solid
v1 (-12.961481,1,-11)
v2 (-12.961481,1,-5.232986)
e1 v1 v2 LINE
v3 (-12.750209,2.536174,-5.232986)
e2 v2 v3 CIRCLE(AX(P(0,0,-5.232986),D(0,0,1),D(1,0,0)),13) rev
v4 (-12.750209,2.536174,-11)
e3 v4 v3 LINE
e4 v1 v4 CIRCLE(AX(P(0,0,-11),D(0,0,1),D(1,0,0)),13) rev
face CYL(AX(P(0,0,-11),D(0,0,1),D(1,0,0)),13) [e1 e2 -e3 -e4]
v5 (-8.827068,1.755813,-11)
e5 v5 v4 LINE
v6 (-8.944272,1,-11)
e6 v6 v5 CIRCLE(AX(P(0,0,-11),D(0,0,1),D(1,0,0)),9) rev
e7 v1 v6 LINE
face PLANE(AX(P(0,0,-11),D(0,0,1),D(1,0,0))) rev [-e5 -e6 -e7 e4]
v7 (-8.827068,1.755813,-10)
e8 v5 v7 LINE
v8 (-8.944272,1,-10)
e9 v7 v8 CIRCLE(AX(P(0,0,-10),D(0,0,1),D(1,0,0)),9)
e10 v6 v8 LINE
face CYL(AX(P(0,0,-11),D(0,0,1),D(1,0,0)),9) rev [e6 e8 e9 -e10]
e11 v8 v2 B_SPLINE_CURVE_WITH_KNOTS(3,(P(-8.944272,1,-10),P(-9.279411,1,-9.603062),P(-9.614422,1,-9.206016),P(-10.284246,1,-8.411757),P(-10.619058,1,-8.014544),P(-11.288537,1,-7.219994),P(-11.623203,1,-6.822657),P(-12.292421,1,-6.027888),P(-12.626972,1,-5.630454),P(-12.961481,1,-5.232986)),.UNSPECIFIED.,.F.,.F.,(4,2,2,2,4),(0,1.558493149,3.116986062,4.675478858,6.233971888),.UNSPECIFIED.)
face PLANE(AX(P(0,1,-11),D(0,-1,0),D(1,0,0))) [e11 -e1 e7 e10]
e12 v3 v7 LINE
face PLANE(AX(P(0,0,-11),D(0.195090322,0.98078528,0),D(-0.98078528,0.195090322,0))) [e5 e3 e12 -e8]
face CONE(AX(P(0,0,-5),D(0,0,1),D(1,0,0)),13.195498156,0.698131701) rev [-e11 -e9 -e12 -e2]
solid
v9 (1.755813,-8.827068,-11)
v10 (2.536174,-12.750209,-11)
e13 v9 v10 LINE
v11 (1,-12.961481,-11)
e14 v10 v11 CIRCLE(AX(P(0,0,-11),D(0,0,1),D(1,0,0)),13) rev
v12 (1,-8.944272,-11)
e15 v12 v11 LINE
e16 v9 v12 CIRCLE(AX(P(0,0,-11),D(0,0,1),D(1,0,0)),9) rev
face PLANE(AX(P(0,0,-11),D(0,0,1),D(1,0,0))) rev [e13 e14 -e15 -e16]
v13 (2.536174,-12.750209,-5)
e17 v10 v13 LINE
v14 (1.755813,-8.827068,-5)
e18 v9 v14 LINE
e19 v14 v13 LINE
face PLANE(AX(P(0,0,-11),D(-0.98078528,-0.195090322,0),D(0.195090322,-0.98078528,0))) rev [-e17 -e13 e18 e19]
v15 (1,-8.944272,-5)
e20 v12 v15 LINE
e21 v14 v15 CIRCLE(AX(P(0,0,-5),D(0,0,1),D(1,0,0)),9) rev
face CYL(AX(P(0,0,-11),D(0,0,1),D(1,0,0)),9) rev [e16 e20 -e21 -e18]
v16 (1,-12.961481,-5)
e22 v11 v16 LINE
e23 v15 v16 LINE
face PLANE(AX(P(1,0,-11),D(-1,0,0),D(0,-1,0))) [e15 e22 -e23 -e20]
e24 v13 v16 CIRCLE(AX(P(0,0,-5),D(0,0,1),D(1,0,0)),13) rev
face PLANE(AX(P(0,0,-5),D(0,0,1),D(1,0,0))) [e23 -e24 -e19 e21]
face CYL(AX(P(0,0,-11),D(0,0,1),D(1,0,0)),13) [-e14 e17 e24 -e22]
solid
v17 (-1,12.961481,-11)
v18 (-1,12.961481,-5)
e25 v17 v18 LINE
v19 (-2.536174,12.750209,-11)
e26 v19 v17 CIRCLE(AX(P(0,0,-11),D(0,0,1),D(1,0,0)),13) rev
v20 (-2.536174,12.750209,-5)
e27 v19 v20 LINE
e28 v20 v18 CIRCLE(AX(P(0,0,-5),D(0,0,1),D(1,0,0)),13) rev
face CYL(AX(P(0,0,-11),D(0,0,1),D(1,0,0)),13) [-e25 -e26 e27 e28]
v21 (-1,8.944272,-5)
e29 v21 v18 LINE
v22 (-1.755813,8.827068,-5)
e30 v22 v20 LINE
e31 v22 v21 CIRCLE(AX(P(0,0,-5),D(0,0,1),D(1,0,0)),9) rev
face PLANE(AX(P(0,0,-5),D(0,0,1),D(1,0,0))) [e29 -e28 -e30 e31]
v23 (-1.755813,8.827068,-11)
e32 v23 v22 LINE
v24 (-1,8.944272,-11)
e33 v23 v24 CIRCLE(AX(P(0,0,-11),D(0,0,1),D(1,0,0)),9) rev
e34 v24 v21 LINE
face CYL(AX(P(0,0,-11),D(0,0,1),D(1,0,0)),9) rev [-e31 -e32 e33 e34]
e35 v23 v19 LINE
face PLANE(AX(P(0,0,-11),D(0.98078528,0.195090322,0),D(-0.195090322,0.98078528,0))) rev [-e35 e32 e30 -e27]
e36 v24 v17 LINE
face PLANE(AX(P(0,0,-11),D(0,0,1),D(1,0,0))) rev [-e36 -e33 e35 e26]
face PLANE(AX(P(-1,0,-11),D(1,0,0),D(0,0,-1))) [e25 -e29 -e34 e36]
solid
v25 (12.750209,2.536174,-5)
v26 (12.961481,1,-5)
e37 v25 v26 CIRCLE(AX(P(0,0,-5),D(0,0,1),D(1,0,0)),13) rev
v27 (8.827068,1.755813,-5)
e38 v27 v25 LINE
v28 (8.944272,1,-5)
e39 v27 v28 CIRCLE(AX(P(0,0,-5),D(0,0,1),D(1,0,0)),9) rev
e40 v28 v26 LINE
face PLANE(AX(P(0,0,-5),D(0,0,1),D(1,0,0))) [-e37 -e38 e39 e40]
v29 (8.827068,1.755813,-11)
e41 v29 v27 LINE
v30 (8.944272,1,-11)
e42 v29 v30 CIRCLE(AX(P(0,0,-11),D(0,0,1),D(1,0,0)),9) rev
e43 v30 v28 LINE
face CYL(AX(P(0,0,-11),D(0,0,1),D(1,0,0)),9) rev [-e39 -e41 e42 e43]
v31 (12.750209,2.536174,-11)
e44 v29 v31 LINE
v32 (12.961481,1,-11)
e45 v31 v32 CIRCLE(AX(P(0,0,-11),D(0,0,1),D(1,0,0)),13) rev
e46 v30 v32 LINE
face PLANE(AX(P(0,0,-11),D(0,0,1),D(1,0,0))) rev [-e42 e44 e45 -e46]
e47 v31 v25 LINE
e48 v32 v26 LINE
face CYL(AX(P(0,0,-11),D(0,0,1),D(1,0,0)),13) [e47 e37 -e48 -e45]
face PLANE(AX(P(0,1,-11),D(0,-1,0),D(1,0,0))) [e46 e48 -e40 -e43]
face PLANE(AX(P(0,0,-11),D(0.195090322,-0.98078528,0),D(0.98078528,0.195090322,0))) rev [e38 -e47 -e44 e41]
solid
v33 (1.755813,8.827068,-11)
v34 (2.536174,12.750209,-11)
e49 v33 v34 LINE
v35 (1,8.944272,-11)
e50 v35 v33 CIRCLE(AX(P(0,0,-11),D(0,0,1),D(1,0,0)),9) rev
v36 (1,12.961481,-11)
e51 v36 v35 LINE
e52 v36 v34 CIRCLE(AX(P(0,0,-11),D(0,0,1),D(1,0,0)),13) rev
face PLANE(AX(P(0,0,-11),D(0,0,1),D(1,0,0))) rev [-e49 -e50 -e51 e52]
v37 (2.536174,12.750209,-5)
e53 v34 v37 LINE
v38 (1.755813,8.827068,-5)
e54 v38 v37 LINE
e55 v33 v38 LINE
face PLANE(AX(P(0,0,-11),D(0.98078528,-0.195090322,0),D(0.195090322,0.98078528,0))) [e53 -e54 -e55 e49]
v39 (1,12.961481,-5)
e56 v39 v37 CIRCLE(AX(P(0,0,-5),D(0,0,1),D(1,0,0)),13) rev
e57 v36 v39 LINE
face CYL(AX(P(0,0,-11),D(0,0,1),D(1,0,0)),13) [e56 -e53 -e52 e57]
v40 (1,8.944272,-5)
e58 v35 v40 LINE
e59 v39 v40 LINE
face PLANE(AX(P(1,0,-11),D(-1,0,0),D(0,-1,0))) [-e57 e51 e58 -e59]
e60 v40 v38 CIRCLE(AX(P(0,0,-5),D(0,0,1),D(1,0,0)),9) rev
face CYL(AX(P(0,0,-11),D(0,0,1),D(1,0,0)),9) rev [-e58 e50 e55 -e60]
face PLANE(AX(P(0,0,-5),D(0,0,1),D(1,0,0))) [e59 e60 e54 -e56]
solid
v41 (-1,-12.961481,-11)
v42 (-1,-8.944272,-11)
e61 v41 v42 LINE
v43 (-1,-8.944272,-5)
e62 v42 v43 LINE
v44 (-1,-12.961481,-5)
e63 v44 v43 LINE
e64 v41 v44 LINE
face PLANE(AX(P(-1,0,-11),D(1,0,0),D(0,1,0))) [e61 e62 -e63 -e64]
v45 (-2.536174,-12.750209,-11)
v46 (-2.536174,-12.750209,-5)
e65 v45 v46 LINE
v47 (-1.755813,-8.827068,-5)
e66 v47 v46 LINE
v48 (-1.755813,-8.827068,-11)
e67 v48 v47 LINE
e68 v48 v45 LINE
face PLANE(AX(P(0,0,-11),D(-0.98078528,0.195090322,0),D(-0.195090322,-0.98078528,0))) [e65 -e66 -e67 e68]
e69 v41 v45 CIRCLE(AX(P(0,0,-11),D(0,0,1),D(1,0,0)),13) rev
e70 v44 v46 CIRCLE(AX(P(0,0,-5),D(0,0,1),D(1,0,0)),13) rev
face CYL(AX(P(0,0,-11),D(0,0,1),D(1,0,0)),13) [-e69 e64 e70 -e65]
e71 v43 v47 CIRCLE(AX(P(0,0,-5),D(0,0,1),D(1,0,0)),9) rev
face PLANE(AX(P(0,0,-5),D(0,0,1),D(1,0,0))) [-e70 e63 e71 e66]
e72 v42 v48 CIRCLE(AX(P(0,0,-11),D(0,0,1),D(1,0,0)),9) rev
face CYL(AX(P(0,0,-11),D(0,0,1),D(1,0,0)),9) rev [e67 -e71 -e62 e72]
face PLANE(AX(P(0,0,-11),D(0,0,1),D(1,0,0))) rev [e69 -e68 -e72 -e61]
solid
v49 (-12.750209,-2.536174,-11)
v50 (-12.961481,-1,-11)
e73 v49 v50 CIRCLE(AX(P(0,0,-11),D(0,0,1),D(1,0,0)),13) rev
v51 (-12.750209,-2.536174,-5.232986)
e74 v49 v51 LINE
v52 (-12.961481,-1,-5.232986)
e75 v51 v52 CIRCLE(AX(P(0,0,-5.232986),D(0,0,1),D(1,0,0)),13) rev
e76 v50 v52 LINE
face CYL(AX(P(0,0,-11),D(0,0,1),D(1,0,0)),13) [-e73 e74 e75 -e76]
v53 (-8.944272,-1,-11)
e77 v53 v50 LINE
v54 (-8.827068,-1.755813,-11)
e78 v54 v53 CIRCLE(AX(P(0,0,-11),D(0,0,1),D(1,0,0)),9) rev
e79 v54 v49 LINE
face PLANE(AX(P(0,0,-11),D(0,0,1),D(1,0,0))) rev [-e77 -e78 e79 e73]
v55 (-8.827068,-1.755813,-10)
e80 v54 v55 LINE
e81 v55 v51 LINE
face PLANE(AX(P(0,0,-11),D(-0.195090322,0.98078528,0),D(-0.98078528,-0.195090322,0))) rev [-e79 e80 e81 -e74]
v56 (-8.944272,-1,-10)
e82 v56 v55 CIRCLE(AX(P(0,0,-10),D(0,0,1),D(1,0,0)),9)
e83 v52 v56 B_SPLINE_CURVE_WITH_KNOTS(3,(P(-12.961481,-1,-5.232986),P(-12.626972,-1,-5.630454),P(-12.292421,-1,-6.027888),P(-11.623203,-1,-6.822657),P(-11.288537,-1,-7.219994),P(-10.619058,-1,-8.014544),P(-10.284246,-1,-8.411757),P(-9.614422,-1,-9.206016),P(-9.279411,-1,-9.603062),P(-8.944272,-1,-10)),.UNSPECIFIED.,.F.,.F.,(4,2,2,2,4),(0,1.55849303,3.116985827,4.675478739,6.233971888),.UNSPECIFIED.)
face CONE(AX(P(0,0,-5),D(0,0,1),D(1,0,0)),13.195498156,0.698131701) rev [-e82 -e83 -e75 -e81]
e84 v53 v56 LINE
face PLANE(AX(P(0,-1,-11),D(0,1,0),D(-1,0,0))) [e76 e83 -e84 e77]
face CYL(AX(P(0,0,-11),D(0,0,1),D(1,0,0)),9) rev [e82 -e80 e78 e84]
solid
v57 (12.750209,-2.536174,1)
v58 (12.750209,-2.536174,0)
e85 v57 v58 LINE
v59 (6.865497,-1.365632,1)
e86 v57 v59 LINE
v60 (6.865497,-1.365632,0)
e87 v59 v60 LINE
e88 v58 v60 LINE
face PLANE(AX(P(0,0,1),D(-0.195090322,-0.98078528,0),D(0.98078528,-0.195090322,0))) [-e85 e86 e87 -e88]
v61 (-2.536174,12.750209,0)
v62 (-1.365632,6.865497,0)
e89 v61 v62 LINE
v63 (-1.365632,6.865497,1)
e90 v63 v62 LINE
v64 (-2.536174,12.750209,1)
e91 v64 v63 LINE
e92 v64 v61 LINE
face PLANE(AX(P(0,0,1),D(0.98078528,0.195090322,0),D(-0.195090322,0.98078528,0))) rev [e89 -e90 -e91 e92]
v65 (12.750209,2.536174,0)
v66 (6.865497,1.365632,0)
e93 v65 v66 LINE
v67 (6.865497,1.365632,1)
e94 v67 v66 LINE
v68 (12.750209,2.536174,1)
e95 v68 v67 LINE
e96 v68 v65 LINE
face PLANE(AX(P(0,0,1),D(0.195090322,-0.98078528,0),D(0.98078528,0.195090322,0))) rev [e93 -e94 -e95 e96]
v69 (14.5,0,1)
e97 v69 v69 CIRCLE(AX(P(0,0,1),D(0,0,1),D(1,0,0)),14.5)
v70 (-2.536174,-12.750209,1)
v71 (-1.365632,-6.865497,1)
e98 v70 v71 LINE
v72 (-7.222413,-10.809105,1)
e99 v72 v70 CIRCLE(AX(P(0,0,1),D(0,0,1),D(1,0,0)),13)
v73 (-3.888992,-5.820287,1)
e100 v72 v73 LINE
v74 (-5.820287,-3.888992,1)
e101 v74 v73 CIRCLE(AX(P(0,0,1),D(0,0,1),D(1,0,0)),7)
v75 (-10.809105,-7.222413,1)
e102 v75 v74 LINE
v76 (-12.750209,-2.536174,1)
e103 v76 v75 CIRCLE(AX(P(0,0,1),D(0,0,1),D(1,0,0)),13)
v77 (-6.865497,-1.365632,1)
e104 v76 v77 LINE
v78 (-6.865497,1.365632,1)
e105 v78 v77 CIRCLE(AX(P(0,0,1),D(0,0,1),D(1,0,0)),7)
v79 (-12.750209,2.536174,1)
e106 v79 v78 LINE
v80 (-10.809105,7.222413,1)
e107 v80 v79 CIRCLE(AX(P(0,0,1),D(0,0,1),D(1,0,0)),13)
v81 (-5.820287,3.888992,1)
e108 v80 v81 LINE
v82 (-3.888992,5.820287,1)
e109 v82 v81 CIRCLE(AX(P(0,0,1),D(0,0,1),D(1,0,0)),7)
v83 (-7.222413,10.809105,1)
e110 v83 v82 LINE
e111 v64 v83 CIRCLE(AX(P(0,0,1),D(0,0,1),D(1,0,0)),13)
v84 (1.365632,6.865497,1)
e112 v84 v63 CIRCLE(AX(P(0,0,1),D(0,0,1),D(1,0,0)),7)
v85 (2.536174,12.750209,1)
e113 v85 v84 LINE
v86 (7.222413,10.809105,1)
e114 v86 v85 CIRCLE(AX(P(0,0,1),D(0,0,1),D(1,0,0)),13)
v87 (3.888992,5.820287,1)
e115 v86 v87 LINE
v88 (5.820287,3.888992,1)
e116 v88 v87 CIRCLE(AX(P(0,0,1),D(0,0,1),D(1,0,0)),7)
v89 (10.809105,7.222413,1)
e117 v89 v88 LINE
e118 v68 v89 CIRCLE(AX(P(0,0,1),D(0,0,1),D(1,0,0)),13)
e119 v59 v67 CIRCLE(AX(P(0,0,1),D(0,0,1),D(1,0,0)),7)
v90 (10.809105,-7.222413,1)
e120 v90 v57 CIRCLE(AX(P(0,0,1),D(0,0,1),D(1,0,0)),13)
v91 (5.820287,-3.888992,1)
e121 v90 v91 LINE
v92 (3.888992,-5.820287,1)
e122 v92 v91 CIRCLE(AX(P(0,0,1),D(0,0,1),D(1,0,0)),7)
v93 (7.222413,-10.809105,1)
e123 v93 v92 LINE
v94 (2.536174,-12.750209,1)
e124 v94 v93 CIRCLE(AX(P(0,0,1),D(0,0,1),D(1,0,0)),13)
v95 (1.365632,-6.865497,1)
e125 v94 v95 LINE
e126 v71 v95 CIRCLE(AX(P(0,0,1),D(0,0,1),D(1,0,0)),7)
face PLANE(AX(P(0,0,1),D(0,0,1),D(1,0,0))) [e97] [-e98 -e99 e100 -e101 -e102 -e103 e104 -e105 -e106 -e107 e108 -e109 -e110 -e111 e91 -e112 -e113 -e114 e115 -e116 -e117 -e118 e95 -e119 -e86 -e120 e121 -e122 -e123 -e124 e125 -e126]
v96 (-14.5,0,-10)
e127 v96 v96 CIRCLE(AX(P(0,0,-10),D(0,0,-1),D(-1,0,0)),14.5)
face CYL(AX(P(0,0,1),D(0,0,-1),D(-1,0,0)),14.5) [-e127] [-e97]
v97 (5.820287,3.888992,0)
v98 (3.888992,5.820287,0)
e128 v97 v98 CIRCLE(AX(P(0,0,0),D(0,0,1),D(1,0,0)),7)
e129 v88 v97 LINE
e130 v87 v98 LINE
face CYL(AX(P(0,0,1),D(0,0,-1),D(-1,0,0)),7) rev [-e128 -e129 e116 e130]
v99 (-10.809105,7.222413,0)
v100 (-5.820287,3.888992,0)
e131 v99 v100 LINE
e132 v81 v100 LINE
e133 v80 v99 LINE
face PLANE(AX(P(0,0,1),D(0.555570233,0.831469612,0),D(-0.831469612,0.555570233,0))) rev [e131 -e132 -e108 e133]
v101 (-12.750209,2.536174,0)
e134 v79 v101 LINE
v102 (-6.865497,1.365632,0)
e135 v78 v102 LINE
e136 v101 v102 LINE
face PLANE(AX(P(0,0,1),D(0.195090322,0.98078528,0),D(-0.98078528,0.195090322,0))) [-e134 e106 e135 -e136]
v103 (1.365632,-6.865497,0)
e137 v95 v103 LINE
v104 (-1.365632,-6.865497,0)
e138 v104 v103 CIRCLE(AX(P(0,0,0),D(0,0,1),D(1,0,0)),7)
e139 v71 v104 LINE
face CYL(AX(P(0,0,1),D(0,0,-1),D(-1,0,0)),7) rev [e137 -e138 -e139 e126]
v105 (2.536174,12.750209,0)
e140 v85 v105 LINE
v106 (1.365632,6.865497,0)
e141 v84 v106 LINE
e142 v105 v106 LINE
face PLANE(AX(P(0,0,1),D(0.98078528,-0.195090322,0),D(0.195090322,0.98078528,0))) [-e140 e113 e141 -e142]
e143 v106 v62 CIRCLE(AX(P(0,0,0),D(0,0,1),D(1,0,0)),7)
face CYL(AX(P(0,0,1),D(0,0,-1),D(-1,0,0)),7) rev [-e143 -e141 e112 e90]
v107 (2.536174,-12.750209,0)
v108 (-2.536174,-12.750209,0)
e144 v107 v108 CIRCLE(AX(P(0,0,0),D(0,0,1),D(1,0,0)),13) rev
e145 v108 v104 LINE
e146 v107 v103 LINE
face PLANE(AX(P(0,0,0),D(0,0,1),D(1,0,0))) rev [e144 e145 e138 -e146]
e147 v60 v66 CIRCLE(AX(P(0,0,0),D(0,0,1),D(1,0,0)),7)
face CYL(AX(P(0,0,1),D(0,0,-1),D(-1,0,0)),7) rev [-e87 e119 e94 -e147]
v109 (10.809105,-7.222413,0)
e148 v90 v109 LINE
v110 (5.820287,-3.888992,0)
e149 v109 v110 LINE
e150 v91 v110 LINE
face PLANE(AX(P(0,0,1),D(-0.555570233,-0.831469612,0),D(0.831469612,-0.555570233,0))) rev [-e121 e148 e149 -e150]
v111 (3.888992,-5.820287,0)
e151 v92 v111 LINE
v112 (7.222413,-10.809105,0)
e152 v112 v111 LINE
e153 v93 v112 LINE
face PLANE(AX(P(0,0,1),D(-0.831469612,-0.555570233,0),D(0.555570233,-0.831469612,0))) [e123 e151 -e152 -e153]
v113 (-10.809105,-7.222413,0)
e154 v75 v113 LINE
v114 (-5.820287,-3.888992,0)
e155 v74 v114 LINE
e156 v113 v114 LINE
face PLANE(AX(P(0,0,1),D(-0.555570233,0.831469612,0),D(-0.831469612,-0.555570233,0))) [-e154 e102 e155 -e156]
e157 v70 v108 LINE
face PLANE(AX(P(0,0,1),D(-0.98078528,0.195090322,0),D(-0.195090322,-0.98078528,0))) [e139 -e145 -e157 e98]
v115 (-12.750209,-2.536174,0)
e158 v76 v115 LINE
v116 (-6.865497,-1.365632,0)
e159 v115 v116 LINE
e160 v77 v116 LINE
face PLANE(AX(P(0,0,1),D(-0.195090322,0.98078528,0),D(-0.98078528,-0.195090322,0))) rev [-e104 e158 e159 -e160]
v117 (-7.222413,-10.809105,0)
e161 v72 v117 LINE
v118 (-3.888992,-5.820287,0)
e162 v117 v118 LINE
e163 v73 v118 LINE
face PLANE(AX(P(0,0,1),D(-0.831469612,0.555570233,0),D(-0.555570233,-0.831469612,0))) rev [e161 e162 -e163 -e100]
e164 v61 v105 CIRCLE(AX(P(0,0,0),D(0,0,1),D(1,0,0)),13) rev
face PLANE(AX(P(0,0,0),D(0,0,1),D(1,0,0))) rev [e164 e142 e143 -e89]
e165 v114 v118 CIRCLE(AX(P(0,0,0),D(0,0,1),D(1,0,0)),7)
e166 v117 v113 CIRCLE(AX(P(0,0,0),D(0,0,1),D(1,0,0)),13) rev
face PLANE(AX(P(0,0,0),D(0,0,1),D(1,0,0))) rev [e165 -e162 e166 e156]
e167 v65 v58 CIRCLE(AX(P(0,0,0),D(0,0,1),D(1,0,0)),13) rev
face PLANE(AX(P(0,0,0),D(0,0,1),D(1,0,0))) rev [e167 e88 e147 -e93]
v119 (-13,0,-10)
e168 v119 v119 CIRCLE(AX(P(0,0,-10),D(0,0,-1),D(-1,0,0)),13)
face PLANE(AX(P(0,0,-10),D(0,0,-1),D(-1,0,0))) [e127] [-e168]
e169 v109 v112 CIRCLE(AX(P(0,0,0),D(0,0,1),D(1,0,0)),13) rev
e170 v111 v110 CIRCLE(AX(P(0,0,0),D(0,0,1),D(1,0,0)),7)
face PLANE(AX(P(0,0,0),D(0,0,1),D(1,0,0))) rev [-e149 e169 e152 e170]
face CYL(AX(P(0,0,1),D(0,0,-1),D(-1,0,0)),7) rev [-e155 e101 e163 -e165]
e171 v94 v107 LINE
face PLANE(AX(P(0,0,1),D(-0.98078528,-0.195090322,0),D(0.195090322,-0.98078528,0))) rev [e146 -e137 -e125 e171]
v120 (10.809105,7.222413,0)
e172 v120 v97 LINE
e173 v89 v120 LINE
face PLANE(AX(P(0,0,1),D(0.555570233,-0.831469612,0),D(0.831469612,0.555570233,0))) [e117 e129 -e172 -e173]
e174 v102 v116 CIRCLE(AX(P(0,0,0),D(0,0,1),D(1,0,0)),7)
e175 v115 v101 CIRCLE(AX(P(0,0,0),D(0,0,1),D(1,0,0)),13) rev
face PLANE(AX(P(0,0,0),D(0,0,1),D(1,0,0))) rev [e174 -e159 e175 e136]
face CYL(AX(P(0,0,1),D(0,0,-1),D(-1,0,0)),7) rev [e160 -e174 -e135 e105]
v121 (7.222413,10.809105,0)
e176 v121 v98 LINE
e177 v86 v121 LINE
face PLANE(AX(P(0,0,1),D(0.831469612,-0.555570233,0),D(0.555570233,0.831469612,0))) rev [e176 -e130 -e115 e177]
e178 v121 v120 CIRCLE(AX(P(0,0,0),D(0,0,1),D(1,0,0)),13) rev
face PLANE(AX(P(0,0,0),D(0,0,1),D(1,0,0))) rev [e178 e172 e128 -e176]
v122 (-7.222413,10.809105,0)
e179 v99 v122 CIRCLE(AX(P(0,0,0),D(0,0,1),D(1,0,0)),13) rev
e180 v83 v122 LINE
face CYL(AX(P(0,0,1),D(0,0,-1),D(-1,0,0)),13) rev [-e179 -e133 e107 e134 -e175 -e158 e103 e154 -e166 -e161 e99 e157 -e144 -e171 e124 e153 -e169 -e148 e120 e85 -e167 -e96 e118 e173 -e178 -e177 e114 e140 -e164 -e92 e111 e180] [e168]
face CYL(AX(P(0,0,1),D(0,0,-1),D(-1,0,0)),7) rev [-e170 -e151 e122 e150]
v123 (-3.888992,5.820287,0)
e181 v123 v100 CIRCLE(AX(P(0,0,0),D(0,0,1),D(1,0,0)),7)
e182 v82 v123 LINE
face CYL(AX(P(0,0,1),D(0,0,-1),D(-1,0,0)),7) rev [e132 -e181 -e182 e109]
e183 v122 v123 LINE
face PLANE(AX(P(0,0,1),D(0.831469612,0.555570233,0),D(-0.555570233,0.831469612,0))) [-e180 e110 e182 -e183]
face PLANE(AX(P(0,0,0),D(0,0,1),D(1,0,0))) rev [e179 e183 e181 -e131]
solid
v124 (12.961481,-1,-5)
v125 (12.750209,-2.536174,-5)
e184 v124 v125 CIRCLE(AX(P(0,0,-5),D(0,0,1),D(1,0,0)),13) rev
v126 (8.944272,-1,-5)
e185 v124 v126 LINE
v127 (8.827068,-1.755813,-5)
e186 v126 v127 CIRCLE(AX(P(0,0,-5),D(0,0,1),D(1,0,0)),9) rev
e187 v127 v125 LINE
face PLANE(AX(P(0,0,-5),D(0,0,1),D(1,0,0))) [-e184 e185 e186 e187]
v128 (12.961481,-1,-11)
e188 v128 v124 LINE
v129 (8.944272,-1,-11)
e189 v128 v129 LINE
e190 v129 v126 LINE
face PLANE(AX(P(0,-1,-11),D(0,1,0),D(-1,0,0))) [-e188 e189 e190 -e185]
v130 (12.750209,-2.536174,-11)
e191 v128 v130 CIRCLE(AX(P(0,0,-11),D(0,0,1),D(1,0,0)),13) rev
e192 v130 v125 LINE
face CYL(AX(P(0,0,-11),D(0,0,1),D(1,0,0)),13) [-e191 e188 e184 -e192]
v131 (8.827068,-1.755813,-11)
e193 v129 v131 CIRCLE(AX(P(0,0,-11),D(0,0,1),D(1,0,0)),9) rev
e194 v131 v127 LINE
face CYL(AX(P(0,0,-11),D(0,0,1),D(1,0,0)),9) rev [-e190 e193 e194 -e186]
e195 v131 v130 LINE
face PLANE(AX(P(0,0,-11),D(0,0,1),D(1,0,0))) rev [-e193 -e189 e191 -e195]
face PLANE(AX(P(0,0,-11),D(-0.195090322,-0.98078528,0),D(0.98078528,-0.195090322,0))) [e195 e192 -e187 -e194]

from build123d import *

# Parameters (mm, degrees)
SKETCH1_R             = 14.5
BOSS_EXTRUDE1_DEPTH   = 1
BOSS_EXTRUDE2_START   = 6
BOSS_EXTRUDE2_DEPTH   = 6
BOSS_EXTRUDE2_2_DEPTH = 6
BOSS_EXTRUDE2_3_DEPTH = 6
BOSS_EXTRUDE2_4_DEPTH = 6
BOSS_EXTRUDE2_5_DEPTH = 6
BOSS_EXTRUDE2_6_DEPTH = 6
BOSS_EXTRUDE2_7_DEPTH = 6
BOSS_EXTRUDE2_8_DEPTH = 6
BOSS_EXTRUDE3_START   = 10
SKETCH3_R             = 14.5
SKETCH3_R_2           = 13
BOSS_EXTRUDE3_DEPTH   = 10
CHAMFER1_SIZE         = 5
CHAMFER1_SIZE_2       = 4.195498156
CHAMFER2_SIZE         = 5
CHAMFER2_SIZE_2       = 4.195498156


with BuildPart() as part:
    # Sketch1 → Boss-Extrude1 (new body)
    with BuildSketch(Plane.XY):
        Circle(SKETCH1_R)
        with BuildLine():
            ThreePointArc((-1.365632254, 6.865496963), (0, 7), (1.365632254, 6.865496963))
            Line((1.365632254, 6.865496963), (2.536174186, 12.750208645))
            ThreePointArc((2.536174186, 12.750208645), (4.974884621, 12.010433923), (7.222413029, 10.80910496))
            Line((7.222413029, 10.80910496), (3.888991631, 5.820287286))
            ThreePointArc((3.888991631, 5.820287286), (4.949747468, 4.949747468), (5.820287286, 3.888991631))
            Line((5.820287286, 3.888991631), (10.80910496, 7.222413029))
            ThreePointArc((10.80910496, 7.222413029), (12.010433923, 4.974884621), (12.750208645, 2.536174186))
            Line((12.750208645, 2.536174186), (6.865496963, 1.365632254))
            ThreePointArc((6.865496963, 1.365632254), (7, 0), (6.865496963, -1.365632254))
            Line((6.865496963, -1.365632254), (12.750208645, -2.536174186))
            ThreePointArc((12.750208645, -2.536174186), (12.010433923, -4.974884621), (10.80910496, -7.222413029))
            Line((10.80910496, -7.222413029), (5.820287286, -3.888991631))
            ThreePointArc((5.820287286, -3.888991631), (4.949747468, -4.949747468), (3.888991631, -5.820287286))
            Line((3.888991631, -5.820287286), (7.222413029, -10.80910496))
            ThreePointArc((7.222413029, -10.80910496), (4.974884621, -12.010433923), (2.536174186, -12.750208645))
            Line((2.536174186, -12.750208645), (1.365632254, -6.865496963))
            ThreePointArc((1.365632254, -6.865496963), (0, -7), (-1.365632254, -6.865496963))
            Line((-1.365632254, -6.865496963), (-2.536174186, -12.750208645))
            ThreePointArc((-2.536174186, -12.750208645), (-4.974884621, -12.010433923), (-7.222413029, -10.80910496))
            Line((-7.222413029, -10.80910496), (-3.888991631, -5.820287286))
            ThreePointArc((-3.888991631, -5.820287286), (-4.949747468, -4.949747468), (-5.820287286, -3.888991631))
            Line((-5.820287286, -3.888991631), (-10.80910496, -7.222413029))
            ThreePointArc((-10.80910496, -7.222413029), (-12.010433923, -4.974884621), (-12.750208645, -2.536174186))
            Line((-12.750208645, -2.536174186), (-6.865496963, -1.365632254))
            ThreePointArc((-6.865496963, -1.365632254), (-7, 0), (-6.865496963, 1.365632254))
            Line((-6.865496963, 1.365632254), (-12.750208645, 2.536174186))
            ThreePointArc((-12.750208645, 2.536174186), (-12.010433923, 4.974884621), (-10.80910496, 7.222413029))
            Line((-10.80910496, 7.222413029), (-5.820287286, 3.888991631))
            ThreePointArc((-5.820287286, 3.888991631), (-4.949747468, 4.949747468), (-3.888991631, 5.820287286))
            Line((-3.888991631, 5.820287286), (-7.222413029, 10.80910496))
            ThreePointArc((-7.222413029, 10.80910496), (-4.974884621, 12.010433923), (-2.536174186, 12.750208645))
            Line((-2.536174186, 12.750208645), (-1.365632254, 6.865496963))
        make_face(mode=Mode.SUBTRACT)
    extrude(amount=BOSS_EXTRUDE1_DEPTH)

    # Sketch3 → Boss-Extrude3 (add)
    with BuildSketch(Plane(origin=(0, 0, 0), x_dir=(-1, 0, 0), z_dir=(0, 0, -1)).offset(BOSS_EXTRUDE3_START)):
        Circle(SKETCH3_R)
        Circle(SKETCH3_R_2, mode=Mode.SUBTRACT)
    extrude(amount=-BOSS_EXTRUDE3_DEPTH)


with BuildPart() as body_2:
    # Sketch2 → Boss-Extrude2 (new body)
    with BuildSketch(Plane(origin=(0, 0, -5), x_dir=(-1, 0, 0), z_dir=(0, 0, -1)).offset(BOSS_EXTRUDE2_START)):
        with BuildLine():
            ThreePointArc((1, 8.94427191), (1.379152058, 8.893702244), (1.755812898, 8.827067524))
            Line((1.755812898, 8.827067524), (2.536174186, 12.750208645))
            ThreePointArc((2.536174186, 12.750208645), (1.771239965, 12.8787697), (1, 12.961481397))
            Line((1, 12.961481397), (1, 8.94427191))
        make_face()
    extrude(amount=-BOSS_EXTRUDE2_DEPTH)


with BuildPart() as body_3:
    # Sketch2 → Boss-Extrude2 2 (new body)
    with BuildSketch(Plane(origin=(0, 0, -5), x_dir=(-1, 0, 0), z_dir=(0, 0, -1)).offset(BOSS_EXTRUDE2_START)):
        with BuildLine():
            ThreePointArc((-1.755812898, 8.827067524), (-1.379152058, 8.893702244), (-1, 8.94427191))
            Line((-1, 8.94427191), (-1, 12.961481397))
            ThreePointArc((-1, 12.961481397), (-1.771239965, 12.8787697), (-2.536174186, 12.750208645))
            Line((-2.536174186, 12.750208645), (-1.755812898, 8.827067524))
        make_face()
    extrude(amount=-BOSS_EXTRUDE2_2_DEPTH)


with BuildPart() as body_4:
    # Sketch2 → Boss-Extrude2 3 (new body)
    with BuildSketch(Plane(origin=(0, 0, -5), x_dir=(-1, 0, 0), z_dir=(0, 0, -1)).offset(BOSS_EXTRUDE2_START)):
        with BuildLine():
            ThreePointArc((-8.94427191, 1), (-8.893702244, 1.379152058), (-8.827067524, 1.755812898))
            Line((-8.827067524, 1.755812898), (-12.750208645, 2.536174186))
            ThreePointArc((-12.750208645, 2.536174186), (-12.8787697, 1.771239965), (-12.961481397, 1))
            Line((-12.961481397, 1), (-8.94427191, 1))
        make_face()
    extrude(amount=-BOSS_EXTRUDE2_3_DEPTH)


with BuildPart() as body_5:
    # Sketch2 → Boss-Extrude2 4 (new body)
    with BuildSketch(Plane(origin=(0, 0, -5), x_dir=(-1, 0, 0), z_dir=(0, 0, -1)).offset(BOSS_EXTRUDE2_START)):
        with BuildLine():
            ThreePointArc((-8.827067524, -1.755812898), (-8.893702244, -1.379152058), (-8.94427191, -1))
            Line((-8.94427191, -1), (-12.961481397, -1))
            ThreePointArc((-12.961481397, -1), (-12.8787697, -1.771239965), (-12.750208645, -2.536174186))
            Line((-12.750208645, -2.536174186), (-8.827067524, -1.755812898))
        make_face()
    extrude(amount=-BOSS_EXTRUDE2_4_DEPTH)


with BuildPart() as body_6:
    # Sketch2 → Boss-Extrude2 5 (new body)
    with BuildSketch(Plane(origin=(0, 0, -5), x_dir=(-1, 0, 0), z_dir=(0, 0, -1)).offset(BOSS_EXTRUDE2_START)):
        with BuildLine():
            Line((-1, -12.961481397), (-1, -8.94427191))
            ThreePointArc((-1, -8.94427191), (-1.379152058, -8.893702244), (-1.755812898, -8.827067524))
            Line((-1.755812898, -8.827067524), (-2.536174186, -12.750208645))
            ThreePointArc((-2.536174186, -12.750208645), (-1.771239965, -12.8787697), (-1, -12.961481397))
        make_face()
    extrude(amount=-BOSS_EXTRUDE2_5_DEPTH)


with BuildPart() as body_7:
    # Sketch2 → Boss-Extrude2 6 (new body)
    with BuildSketch(Plane(origin=(0, 0, -5), x_dir=(-1, 0, 0), z_dir=(0, 0, -1)).offset(BOSS_EXTRUDE2_START)):
        with BuildLine():
            Line((2.536174186, -12.750208645), (1.755812898, -8.827067524))
            ThreePointArc((1.755812898, -8.827067524), (1.379152058, -8.893702244), (1, -8.94427191))
            Line((1, -8.94427191), (1, -12.961481397))
            ThreePointArc((1, -12.961481397), (1.771239965, -12.8787697), (2.536174186, -12.750208645))
        make_face()
    extrude(amount=-BOSS_EXTRUDE2_6_DEPTH)


with BuildPart() as body_8:
    # Sketch2 → Boss-Extrude2 7 (new body)
    with BuildSketch(Plane(origin=(0, 0, -5), x_dir=(-1, 0, 0), z_dir=(0, 0, -1)).offset(BOSS_EXTRUDE2_START)):
        with BuildLine():
            Line((12.961481397, -1), (8.94427191, -1))
            ThreePointArc((8.94427191, -1), (8.893702244, -1.379152058), (8.827067524, -1.755812898))
            Line((8.827067524, -1.755812898), (12.750208645, -2.536174186))
            ThreePointArc((12.750208645, -2.536174186), (12.8787697, -1.771239965), (12.961481397, -1))
        make_face()
    extrude(amount=-BOSS_EXTRUDE2_7_DEPTH)

    # Chamfer1
    # the kernel refuses this chamfer: 5, 4.195498156 mm, written as the material it takes off along each edge
    with BuildSketch(Plane(origin=(0, 0, -5), x_dir=(-0.24763976324851328, 0.9688521804992858, 0), z_dir=(0.9688521804992858, 0.24763976324851328, 0))) as chamfer1_piece_1:
        Polygon((9, -CHAMFER1_SIZE), (9 + CHAMFER1_SIZE_2, 0), (9, 0), align=None)
    revolve(axis=Axis((0, 0, -5), (0, 0, 1)), revolution_arc=168.953591464, mode=Mode.SUBTRACT)


with BuildPart() as body_9:
    # Sketch2 → Boss-Extrude2 8 (new body)
    with BuildSketch(Plane(origin=(0, 0, -5), x_dir=(-1, 0, 0), z_dir=(0, 0, -1)).offset(BOSS_EXTRUDE2_START)):
        with BuildLine():
            Line((12.750208645, 2.536174186), (8.827067524, 1.755812898))
            ThreePointArc((8.827067524, 1.755812898), (8.893702244, 1.379152058), (8.94427191, 1))
            Line((8.94427191, 1), (12.961481397, 1))
            ThreePointArc((12.961481397, 1), (12.8787697, 1.771239965), (12.750208645, 2.536174186))
        make_face()
    extrude(amount=-BOSS_EXTRUDE2_8_DEPTH)

    # Chamfer2
    # the kernel refuses this chamfer: 5, 4.195498156 mm, written as the material it takes off along each edge
    with BuildSketch(Plane(origin=(0, 0, -5), x_dir=(0.05741558541416482, 0.9983503646273431, 0), z_dir=(0.9983503646273431, -0.05741558541416482, 0))) as chamfer2_piece_1:
        Polygon((9, -CHAMFER2_SIZE), (9 + CHAMFER2_SIZE_2, 0), (9, 0), align=None)
    revolve(axis=Axis((0, 0, -5), (0, 0, 1)), revolution_arc=168.953591464, mode=Mode.SUBTRACT)


solid = Compound([part.part, body_2.part, body_3.part, body_4.part, body_5.part, body_6.part, body_7.part, body_8.part, body_9.part])
